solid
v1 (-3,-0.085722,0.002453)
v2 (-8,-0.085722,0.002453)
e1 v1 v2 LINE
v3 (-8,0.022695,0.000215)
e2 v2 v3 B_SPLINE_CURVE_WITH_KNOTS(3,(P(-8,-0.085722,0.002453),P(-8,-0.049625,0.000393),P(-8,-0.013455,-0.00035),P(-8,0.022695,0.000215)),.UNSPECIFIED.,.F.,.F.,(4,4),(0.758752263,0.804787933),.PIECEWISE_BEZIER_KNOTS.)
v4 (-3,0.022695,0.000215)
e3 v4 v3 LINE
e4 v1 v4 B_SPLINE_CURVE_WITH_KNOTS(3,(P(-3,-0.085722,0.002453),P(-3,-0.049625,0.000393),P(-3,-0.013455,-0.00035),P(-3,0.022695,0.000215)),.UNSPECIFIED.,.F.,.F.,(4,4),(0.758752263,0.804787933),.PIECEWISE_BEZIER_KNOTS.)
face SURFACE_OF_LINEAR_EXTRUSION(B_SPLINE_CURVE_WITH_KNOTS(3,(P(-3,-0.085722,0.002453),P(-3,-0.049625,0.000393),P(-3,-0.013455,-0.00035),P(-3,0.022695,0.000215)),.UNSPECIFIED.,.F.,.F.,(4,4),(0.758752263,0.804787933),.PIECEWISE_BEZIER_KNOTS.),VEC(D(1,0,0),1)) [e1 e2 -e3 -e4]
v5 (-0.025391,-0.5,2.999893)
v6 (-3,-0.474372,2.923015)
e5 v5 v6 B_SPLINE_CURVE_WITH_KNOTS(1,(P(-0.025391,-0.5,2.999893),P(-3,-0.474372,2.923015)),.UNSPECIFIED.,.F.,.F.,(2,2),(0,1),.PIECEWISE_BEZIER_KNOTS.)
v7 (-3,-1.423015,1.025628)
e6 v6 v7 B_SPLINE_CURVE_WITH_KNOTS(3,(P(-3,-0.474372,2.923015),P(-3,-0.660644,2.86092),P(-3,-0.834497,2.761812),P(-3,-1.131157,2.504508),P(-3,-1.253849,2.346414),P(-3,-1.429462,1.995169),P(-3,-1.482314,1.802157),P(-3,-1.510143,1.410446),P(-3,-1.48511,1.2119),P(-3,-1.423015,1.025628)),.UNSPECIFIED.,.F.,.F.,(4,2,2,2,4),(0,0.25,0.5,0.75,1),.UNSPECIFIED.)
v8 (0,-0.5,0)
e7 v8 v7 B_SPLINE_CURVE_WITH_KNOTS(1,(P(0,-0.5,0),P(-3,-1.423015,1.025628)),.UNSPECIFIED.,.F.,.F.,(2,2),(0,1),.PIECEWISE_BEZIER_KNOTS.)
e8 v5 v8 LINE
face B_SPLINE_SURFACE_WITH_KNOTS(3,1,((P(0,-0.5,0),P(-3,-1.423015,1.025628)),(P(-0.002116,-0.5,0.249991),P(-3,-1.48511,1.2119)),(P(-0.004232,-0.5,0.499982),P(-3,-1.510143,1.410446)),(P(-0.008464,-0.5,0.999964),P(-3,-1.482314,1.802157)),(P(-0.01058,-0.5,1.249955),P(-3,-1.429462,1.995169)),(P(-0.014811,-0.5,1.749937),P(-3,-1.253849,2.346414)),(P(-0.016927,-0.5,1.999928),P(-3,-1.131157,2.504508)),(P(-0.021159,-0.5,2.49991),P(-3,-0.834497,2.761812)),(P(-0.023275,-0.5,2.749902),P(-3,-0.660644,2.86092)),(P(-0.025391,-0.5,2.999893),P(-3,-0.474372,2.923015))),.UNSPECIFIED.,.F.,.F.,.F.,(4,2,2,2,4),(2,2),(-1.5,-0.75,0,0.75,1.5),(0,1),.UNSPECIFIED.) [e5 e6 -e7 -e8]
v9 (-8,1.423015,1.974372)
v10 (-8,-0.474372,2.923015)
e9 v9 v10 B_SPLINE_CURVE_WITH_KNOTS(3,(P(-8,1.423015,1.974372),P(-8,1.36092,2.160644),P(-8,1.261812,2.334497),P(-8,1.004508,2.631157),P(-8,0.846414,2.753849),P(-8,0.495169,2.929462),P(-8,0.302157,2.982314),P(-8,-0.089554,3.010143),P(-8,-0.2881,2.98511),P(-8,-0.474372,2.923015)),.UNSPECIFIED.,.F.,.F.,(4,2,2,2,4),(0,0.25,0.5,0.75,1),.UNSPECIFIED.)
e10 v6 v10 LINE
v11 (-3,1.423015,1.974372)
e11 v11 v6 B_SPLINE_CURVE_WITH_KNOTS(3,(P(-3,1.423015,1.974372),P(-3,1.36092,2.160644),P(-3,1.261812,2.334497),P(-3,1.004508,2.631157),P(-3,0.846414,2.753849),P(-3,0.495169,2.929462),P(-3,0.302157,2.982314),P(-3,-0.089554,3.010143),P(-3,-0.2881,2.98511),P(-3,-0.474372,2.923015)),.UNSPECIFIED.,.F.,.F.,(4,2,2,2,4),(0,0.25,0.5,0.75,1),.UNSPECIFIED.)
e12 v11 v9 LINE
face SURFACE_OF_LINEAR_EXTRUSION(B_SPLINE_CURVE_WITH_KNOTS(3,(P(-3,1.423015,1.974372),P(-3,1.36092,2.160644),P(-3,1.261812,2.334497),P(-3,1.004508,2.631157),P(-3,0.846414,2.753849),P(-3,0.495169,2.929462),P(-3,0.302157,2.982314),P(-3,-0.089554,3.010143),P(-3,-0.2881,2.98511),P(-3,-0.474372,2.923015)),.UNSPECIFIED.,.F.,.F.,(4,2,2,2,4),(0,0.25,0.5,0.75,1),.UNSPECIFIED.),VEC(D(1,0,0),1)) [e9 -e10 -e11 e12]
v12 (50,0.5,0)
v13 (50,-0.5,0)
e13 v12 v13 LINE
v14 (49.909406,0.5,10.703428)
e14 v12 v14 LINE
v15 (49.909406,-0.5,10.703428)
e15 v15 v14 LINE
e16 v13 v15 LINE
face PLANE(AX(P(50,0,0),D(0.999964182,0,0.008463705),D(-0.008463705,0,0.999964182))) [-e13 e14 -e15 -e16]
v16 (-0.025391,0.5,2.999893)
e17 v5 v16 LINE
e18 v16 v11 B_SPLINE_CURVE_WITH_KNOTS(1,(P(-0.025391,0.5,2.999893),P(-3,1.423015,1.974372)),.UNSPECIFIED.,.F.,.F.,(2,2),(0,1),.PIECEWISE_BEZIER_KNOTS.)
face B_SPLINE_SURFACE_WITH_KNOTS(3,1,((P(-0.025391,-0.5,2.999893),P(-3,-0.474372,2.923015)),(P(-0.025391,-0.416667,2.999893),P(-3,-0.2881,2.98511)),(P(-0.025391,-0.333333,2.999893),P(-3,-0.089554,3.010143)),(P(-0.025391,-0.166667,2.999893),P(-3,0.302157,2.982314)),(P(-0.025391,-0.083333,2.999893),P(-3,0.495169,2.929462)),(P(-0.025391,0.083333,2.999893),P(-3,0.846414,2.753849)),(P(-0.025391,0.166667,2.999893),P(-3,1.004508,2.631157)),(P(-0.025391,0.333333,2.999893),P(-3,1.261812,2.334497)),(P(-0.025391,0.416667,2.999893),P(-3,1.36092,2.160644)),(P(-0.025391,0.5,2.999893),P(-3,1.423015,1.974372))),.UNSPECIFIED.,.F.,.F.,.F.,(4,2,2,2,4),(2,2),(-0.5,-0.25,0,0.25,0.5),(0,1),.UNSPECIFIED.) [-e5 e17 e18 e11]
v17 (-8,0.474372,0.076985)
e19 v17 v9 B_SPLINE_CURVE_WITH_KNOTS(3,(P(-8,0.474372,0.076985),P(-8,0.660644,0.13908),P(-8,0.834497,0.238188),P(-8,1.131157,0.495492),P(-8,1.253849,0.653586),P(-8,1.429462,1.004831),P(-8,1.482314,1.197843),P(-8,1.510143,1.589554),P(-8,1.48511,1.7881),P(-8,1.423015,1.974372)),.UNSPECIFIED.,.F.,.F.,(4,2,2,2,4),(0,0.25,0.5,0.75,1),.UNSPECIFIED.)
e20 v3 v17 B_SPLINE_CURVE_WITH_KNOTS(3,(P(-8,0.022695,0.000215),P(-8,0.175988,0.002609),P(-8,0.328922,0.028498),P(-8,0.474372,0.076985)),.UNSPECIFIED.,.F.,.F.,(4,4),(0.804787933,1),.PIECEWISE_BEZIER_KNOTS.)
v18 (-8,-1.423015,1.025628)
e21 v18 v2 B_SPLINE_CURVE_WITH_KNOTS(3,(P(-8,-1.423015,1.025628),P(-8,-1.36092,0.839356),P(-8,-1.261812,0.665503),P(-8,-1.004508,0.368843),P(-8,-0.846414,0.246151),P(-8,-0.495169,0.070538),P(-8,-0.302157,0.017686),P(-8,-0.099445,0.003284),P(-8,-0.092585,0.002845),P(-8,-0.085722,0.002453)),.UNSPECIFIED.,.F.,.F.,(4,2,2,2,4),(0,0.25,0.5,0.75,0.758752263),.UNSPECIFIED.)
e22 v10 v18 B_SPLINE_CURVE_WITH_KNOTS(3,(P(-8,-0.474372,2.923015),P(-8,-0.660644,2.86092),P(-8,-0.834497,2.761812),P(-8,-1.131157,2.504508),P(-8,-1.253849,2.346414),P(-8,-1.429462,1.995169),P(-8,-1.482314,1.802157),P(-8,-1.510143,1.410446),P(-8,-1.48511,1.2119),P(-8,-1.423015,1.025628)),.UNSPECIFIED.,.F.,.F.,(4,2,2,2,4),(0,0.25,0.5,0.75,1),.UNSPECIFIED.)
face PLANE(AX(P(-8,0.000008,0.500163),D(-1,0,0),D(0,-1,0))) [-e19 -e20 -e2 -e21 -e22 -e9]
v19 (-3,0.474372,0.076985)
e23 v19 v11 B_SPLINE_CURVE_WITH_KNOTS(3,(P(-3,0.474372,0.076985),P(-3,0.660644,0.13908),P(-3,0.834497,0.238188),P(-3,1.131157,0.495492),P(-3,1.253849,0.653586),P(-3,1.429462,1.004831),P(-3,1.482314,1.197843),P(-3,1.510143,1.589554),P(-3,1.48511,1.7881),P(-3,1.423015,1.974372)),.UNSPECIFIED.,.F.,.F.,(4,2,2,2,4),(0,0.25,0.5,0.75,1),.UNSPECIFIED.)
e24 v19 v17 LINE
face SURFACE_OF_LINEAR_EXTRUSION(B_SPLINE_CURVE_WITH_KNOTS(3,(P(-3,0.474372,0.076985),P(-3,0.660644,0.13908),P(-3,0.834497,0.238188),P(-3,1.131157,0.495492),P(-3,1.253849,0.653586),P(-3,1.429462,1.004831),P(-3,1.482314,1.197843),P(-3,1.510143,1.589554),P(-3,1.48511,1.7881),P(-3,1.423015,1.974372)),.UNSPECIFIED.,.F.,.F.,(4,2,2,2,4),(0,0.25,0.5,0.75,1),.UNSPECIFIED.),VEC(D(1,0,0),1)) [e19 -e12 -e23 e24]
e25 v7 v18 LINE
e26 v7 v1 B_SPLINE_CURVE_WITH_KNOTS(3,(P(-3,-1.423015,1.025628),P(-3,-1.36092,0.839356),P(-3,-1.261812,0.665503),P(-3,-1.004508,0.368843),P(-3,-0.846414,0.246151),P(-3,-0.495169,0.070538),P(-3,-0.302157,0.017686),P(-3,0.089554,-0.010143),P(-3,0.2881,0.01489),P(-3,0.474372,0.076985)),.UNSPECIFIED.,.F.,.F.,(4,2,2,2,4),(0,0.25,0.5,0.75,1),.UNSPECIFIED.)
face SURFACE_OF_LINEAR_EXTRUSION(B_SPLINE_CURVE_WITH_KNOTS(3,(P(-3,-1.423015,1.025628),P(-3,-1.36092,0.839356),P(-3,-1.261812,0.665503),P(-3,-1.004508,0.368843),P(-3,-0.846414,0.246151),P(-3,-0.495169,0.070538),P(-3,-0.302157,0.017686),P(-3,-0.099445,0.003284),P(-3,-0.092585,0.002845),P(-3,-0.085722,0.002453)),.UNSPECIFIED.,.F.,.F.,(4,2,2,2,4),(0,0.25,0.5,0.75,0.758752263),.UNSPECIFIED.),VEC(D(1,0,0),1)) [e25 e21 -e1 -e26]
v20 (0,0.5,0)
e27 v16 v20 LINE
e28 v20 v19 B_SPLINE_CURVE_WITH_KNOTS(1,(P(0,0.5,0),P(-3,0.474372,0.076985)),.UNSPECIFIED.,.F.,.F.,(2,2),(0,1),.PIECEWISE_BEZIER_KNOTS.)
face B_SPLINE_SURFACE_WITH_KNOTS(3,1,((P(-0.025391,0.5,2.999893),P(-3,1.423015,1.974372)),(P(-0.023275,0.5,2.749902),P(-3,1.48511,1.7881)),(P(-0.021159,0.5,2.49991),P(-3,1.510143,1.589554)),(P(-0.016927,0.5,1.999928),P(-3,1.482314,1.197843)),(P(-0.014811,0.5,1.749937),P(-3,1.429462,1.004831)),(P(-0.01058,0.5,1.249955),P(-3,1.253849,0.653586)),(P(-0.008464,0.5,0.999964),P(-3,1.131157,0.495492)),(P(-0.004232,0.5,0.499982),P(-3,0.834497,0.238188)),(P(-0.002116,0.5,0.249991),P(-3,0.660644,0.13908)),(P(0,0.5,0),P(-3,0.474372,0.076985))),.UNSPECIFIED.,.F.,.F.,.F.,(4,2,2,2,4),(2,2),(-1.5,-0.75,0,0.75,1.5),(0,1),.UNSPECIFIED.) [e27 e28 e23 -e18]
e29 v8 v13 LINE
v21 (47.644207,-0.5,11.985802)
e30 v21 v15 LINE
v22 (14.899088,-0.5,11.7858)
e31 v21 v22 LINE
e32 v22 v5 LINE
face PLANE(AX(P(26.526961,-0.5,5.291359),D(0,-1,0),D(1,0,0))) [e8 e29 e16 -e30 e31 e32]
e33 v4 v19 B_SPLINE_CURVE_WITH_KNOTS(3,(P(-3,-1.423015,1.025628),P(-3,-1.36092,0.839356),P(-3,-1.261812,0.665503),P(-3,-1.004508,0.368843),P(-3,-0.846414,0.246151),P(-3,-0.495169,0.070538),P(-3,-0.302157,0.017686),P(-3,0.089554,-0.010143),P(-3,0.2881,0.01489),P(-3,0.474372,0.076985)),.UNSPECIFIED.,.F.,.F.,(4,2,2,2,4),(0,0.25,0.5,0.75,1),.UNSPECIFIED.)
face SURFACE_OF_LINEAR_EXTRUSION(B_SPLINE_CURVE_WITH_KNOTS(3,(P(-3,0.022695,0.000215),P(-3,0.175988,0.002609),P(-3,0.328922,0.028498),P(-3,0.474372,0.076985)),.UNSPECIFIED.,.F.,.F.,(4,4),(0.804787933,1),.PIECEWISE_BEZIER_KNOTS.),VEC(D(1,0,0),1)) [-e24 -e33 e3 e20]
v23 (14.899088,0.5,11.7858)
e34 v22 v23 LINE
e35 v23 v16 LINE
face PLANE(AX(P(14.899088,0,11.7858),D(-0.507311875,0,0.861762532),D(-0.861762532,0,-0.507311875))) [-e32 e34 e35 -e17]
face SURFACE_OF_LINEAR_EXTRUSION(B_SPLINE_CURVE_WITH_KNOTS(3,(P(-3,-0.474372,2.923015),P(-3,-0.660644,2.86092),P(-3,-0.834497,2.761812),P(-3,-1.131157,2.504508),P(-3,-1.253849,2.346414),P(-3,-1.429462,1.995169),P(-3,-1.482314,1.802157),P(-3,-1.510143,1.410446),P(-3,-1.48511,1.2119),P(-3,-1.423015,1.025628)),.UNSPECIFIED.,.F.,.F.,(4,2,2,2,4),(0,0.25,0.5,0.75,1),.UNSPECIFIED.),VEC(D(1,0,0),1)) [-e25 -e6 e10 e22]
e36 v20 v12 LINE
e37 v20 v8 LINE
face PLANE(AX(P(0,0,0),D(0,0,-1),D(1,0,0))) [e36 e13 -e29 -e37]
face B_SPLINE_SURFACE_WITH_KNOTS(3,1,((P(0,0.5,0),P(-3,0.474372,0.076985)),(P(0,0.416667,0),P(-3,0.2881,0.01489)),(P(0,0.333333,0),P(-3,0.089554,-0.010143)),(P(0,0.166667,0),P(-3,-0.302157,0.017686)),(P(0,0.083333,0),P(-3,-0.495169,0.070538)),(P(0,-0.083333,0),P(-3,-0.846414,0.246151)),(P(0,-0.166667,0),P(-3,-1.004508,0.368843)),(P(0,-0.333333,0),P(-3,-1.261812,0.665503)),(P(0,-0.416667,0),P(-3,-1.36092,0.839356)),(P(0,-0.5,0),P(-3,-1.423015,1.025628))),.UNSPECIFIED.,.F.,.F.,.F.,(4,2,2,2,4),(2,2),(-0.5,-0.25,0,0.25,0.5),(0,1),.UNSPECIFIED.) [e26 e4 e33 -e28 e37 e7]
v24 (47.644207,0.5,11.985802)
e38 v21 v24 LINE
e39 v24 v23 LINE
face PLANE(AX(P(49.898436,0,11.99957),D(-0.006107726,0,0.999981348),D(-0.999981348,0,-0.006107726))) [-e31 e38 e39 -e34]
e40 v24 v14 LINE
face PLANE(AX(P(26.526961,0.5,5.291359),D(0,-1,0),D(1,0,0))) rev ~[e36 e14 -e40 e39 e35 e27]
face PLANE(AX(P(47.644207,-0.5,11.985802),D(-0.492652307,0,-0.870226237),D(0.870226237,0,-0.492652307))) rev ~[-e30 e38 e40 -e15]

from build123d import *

# Parameters (mm, degrees)
F1_DEPTH  = 0.5
F1_FACE_W = 1
F1_FACE_H = 3
F6_DEPTH  = 5
F8_DEPTH  = 25


# Not quite as in the source:
# - the arcs of a loft's sections are written as splines that run evenly, so that the points pair up as in the source's solid


with BuildPart() as f1:
    # F0 (on Front) → F1 (new body, symmetric)
    with BuildSketch(Plane.XZ):
        Polygon((-0.0253911159, 2.9998925466), (0, 0), (50, 0), (49.8984355364, 11.9995701865), (14.899088368, 11.7857997863), align=None)
    extrude(amount=F1_DEPTH, both=True)

    # F1_face (on face) → F4 section 0
    with BuildSketch(Plane(origin=(-0.0126955579, 0, 1.4999462733), x_dir=(0, -1, 0), z_dir=(-0.9999641822, 0, -0.0084637053))):
        Rectangle(F1_FACE_W, F1_FACE_H)
    # F3 (on offset) → F4 section 1
    with BuildSketch(Plane.YZ.offset(-3)):
        with BuildLine():
            add(Edge.make_bspline(
                [(-0.4743722327, 2.9230147522), (-0.6606444281, 2.8609195721), (-0.834496694, 2.7618115588), (-1.1311572384, 2.5045080607), (-1.2538487938, 2.3464138139), (-1.4294616132, 1.995169303), (-1.482313781, 1.8021572386), (-1.5101434154, 1.4104455076), (-1.4851099322, 1.2118999628), (-1.4230147522, 1.0256277673)],
                knots=[0, 0, 0, 0, 0.25, 0.25, 0.5, 0.5, 0.75, 0.75, 1, 1, 1, 1], degree=3))
            add(Edge.make_bspline(
                [(-1.4230147522, 1.0256277673), (-1.3609195721, 0.8393555719), (-1.2618115588, 0.665503306), (-1.0045080607, 0.3688427616), (-0.8464138139, 0.2461512062), (-0.495169303, 0.0705383868), (-0.3021572386, 0.017686219), (0.0895544924, -0.0101434154), (0.2881000372, 0.0148900678), (0.4743722327, 0.0769852478)],
                knots=[0, 0, 0, 0, 0.25, 0.25, 0.5, 0.5, 0.75, 0.75, 1, 1, 1, 1], degree=3))
            add(Edge.make_bspline(
                [(0.4743722327, 0.0769852478), (0.6606444281, 0.1390804279), (0.834496694, 0.2381884412), (1.1311572384, 0.4954919393), (1.2538487938, 0.6535861861), (1.4294616132, 1.004830697), (1.482313781, 1.1978427614), (1.5101434154, 1.5895544924), (1.4851099322, 1.7881000372), (1.4230147522, 1.9743722327)],
                knots=[0, 0, 0, 0, 0.25, 0.25, 0.5, 0.5, 0.75, 0.75, 1, 1, 1, 1], degree=3))
            add(Edge.make_bspline(
                [(1.4230147522, 1.9743722327), (1.3609195721, 2.1606444281), (1.2618115588, 2.334496694), (1.0045080607, 2.6311572384), (0.8464138139, 2.7538487938), (0.495169303, 2.9294616132), (0.3021572386, 2.982313781), (-0.0895544924, 3.0101434154), (-0.2881000372, 2.9851099322), (-0.4743722327, 2.9230147522)],
                knots=[0, 0, 0, 0, 0.25, 0.25, 0.5, 0.5, 0.75, 0.75, 1, 1, 1, 1], degree=3))
        make_face()
    loft(ruled=True)

    # F5 (on face) → F6 (join)
    with BuildSketch(Plane(origin=(-3, 0, 0), x_dir=(0, -1, 0), z_dir=(-1, 0, 0))):
        with BuildLine():
            add(Edge.make_bspline(
                [(0.2236067977, 0.9472135955), (0.2049485822, 0.9590404276), (0.165567887, 0.9783654777), (0.1016629971, 0.9971413164), (0.0354857267, 0.9971906029), (-0.0298581595, 1.006417373), (-0.0962378171, 0.9979647462), (-0.1574135127, 0.9730184068), (-0.2213803356, 0.9564199077), (-0.2794920021, 0.9232440711), (-0.3264257064, 0.8766967879), (-0.3795448144, 0.8369923373), (-0.419371865, 0.7835849556), (-0.4393276132, 0.744366395), (-0.4472135955, 0.7236067977)],
                knots=[0, 0, 0, 0, 0.0661130278, 0.1311431351, 0.1976238463, 0.263561262, 0.3285913694, 0.3952621183, 0.461199534, 0.5262296414, 0.5929003903, 0.6590289395, 0.7240590469, 0.7905532518, 0.7905532518, 0.7905532518, 0.7905532518], degree=3))
            add(Edge.make_bspline(
                [(-0.4472135955, 0.7236067977), (-0.4590404276, 0.7049485822), (-0.4783654777, 0.665567887), (-0.4971413164, 0.6016629971), (-0.4971906029, 0.5354857267), (-0.506417373, 0.4701418405), (-0.4979647462, 0.4037621829), (-0.4730184068, 0.3425864873), (-0.4564199077, 0.2786196644), (-0.4232440711, 0.2205079979), (-0.3766967879, 0.1735742936), (-0.3369923373, 0.1204551856), (-0.2835849556, 0.080628135), (-0.244366395, 0.0606723868), (-0.2236067977, 0.0527864045)],
                knots=[0, 0, 0, 0, 0.0661130278, 0.1311431351, 0.1976238463, 0.263561262, 0.3285913694, 0.3952621183, 0.461199534, 0.5262296414, 0.5929003903, 0.6590289395, 0.7240590469, 0.7905532518, 0.7905532518, 0.7905532518, 0.7905532518], degree=3))
            add(Edge.make_bspline(
                [(-0.2236067977, 0.0527864045), (-0.2049485822, 0.0409595724), (-0.165567887, 0.0216345223), (-0.1016629971, 0.0028586836), (-0.0533041533, 0.0028226676), (-0.0269411852, 0.0005980705), (-0.0226951286, 0.0002149422)],
                knots=[0, 0, 0, 0, 0.0661130278, 0.1311431351, 0.1976238463, 0.2103977386, 0.2103977386, 0.2103977386, 0.2103977386], degree=3))
            add(Edge.make_bspline(
                [(0.0857219406, 0.0024530962), (0.0496252148, 0.0003925316), (0.0134550487, -0.000349593), (-0.0226951286, 0.0002149422)],
                knots=[0.7587522631, 0.7587522631, 0.7587522631, 0.7587522631, 0.8047879331, 0.8047879331, 0.8047879331, 0.8047879331], degree=3))
            add(Edge.make_bspline(
                [(0.0857219406, 0.0024530962), (0.0887772594, 0.0031276832), (0.1134683814, 0.0090615655), (0.1574135127, 0.0269815932), (0.2213803356, 0.0435800923), (0.2794920021, 0.0767559289), (0.3264257064, 0.1233032121), (0.3795448144, 0.1630076627), (0.419371865, 0.2164150444), (0.4393276132, 0.255633605), (0.4472135955, 0.2763932023)],
                knots=[0.3192274693, 0.3192274693, 0.3192274693, 0.3192274693, 0.3285913694, 0.3952621183, 0.461199534, 0.5262296414, 0.5929003903, 0.6590289395, 0.7240590469, 0.7905532518, 0.7905532518, 0.7905532518, 0.7905532518], degree=3))
            add(Edge.make_bspline(
                [(0.4472135955, 0.2763932023), (0.4590404276, 0.2950514178), (0.4783654777, 0.334432113), (0.4971413164, 0.3983370029), (0.4971906029, 0.4645142733), (0.506417373, 0.5298581595), (0.4979647462, 0.5962378171), (0.4730184068, 0.6574135127), (0.4564199077, 0.7213803356), (0.4232440711, 0.7794920021), (0.3766967879, 0.8264257064), (0.3369923373, 0.8795448144), (0.2835849556, 0.919371865), (0.244366395, 0.9393276132), (0.2236067977, 0.9472135955)],
                knots=[0, 0, 0, 0, 0.0661130278, 0.1311431351, 0.1976238463, 0.263561262, 0.3285913694, 0.3952621183, 0.461199534, 0.5262296414, 0.5929003903, 0.6590289395, 0.7240590469, 0.7905532518, 0.7905532518, 0.7905532518, 0.7905532518], degree=3))
        make_face()
        with BuildLine():
            add(Edge.make_bspline(
                [(-0.4472135955, 0.7236067977), (-0.4590404276, 0.7049485822), (-0.4783654777, 0.665567887), (-0.4971413164, 0.6016629971), (-0.4971906029, 0.5354857267), (-0.506417373, 0.4701418405), (-0.4979647462, 0.4037621829), (-0.4730184068, 0.3425864873), (-0.4564199077, 0.2786196644), (-0.4232440711, 0.2205079979), (-0.3766967879, 0.1735742936), (-0.3369923373, 0.1204551856), (-0.2835849556, 0.080628135), (-0.244366395, 0.0606723868), (-0.2236067977, 0.0527864045)],
                knots=[0, 0, 0, 0, 0.0661130278, 0.1311431351, 0.1976238463, 0.263561262, 0.3285913694, 0.3952621183, 0.461199534, 0.5262296414, 0.5929003903, 0.6590289395, 0.7240590469, 0.7905532518, 0.7905532518, 0.7905532518, 0.7905532518], degree=3))
            add(Edge.make_bspline(
                [(0.2236067977, 0.9472135955), (0.2049485822, 0.9590404276), (0.165567887, 0.9783654777), (0.1016629971, 0.9971413164), (0.0354857267, 0.9971906029), (-0.0298581595, 1.006417373), (-0.0962378171, 0.9979647462), (-0.1574135127, 0.9730184068), (-0.2213803356, 0.9564199077), (-0.2794920021, 0.9232440711), (-0.3264257064, 0.8766967879), (-0.3795448144, 0.8369923373), (-0.419371865, 0.7835849556), (-0.4393276132, 0.744366395), (-0.4472135955, 0.7236067977)],
                knots=[0, 0, 0, 0, 0.0661130278, 0.1311431351, 0.1976238463, 0.263561262, 0.3285913694, 0.3952621183, 0.461199534, 0.5262296414, 0.5929003903, 0.6590289395, 0.7240590469, 0.7905532518, 0.7905532518, 0.7905532518, 0.7905532518], degree=3))
            add(Edge.make_bspline(
                [(0.4472135955, 0.2763932023), (0.4590404276, 0.2950514178), (0.4783654777, 0.334432113), (0.4971413164, 0.3983370029), (0.4971906029, 0.4645142733), (0.506417373, 0.5298581595), (0.4979647462, 0.5962378171), (0.4730184068, 0.6574135127), (0.4564199077, 0.7213803356), (0.4232440711, 0.7794920021), (0.3766967879, 0.8264257064), (0.3369923373, 0.8795448144), (0.2835849556, 0.919371865), (0.244366395, 0.9393276132), (0.2236067977, 0.9472135955)],
                knots=[0, 0, 0, 0, 0.0661130278, 0.1311431351, 0.1976238463, 0.263561262, 0.3285913694, 0.3952621183, 0.461199534, 0.5262296414, 0.5929003903, 0.6590289395, 0.7240590469, 0.7905532518, 0.7905532518, 0.7905532518, 0.7905532518], degree=3))
            add(Edge.make_bspline(
                [(0.0857219406, 0.0024530962), (0.0887772594, 0.0031276832), (0.1134683814, 0.0090615655), (0.1574135127, 0.0269815932), (0.2213803356, 0.0435800923), (0.2794920021, 0.0767559289), (0.3264257064, 0.1233032121), (0.3795448144, 0.1630076627), (0.419371865, 0.2164150444), (0.4393276132, 0.255633605), (0.4472135955, 0.2763932023)],
                knots=[0.3192274693, 0.3192274693, 0.3192274693, 0.3192274693, 0.3285913694, 0.3952621183, 0.461199534, 0.5262296414, 0.5929003903, 0.6590289395, 0.7240590469, 0.7905532518, 0.7905532518, 0.7905532518, 0.7905532518], degree=3))
            add(Edge.make_bspline(
                [(1.4230147522, 1.0256277673), (1.3609195721, 0.8393555719), (1.2618115588, 0.665503306), (1.0045080607, 0.3688427616), (0.8464138139, 0.2461512062), (0.495169303, 0.0705383868), (0.3021572386, 0.017686219), (0.0994446448, 0.0032842572), (0.09258462, 0.002844849), (0.0857219406, 0.0024530962)],
                knots=[0, 0, 0, 0, 0.25, 0.25, 0.5, 0.5, 0.75, 0.75, 0.7587522631, 0.7587522631, 0.7587522631, 0.7587522631], degree=3))
            add(Edge.make_bspline(
                [(0.4743722327, 2.9230147522), (0.6606444281, 2.8609195721), (0.834496694, 2.7618115588), (1.1311572384, 2.5045080607), (1.2538487938, 2.3464138139), (1.4294616132, 1.995169303), (1.482313781, 1.8021572386), (1.5101434154, 1.4104455076), (1.4851099322, 1.2118999628), (1.4230147522, 1.0256277673)],
                knots=[0, 0, 0, 0, 0.25, 0.25, 0.5, 0.5, 0.75, 0.75, 1, 1, 1, 1], degree=3))
            add(Edge.make_bspline(
                [(-1.4230147522, 1.9743722327), (-1.3609195721, 2.1606444281), (-1.2618115588, 2.334496694), (-1.0045080607, 2.6311572384), (-0.8464138139, 2.7538487938), (-0.495169303, 2.9294616132), (-0.3021572386, 2.982313781), (0.0895544924, 3.0101434154), (0.2881000372, 2.9851099322), (0.4743722327, 2.9230147522)],
                knots=[0, 0, 0, 0, 0.25, 0.25, 0.5, 0.5, 0.75, 0.75, 1, 1, 1, 1], degree=3))
            add(Edge.make_bspline(
                [(-0.4743722327, 0.0769852478), (-0.6606444281, 0.1390804279), (-0.834496694, 0.2381884412), (-1.1311572384, 0.4954919393), (-1.2538487938, 0.6535861861), (-1.4294616132, 1.004830697), (-1.482313781, 1.1978427614), (-1.5101434154, 1.5895544924), (-1.4851099322, 1.7881000372), (-1.4230147522, 1.9743722327)],
                knots=[0, 0, 0, 0, 0.25, 0.25, 0.5, 0.5, 0.75, 0.75, 1, 1, 1, 1], degree=3))
            add(Edge.make_bspline(
                [(-0.0226951286, 0.0002149422), (-0.1759882345, 0.002608827), (-0.3289219115, 0.0284983341), (-0.4743722327, 0.0769852478)],
                knots=[0.8047879331, 0.8047879331, 0.8047879331, 0.8047879331, 1, 1, 1, 1], degree=3))
            add(Edge.make_bspline(
                [(-0.2236067977, 0.0527864045), (-0.2049485822, 0.0409595724), (-0.165567887, 0.0216345223), (-0.1016629971, 0.0028586836), (-0.0533041533, 0.0028226676), (-0.0269411852, 0.0005980705), (-0.0226951286, 0.0002149422)],
                knots=[0, 0, 0, 0, 0.0661130278, 0.1311431351, 0.1976238463, 0.2103977386, 0.2103977386, 0.2103977386, 0.2103977386], degree=3))
        make_face()
    extrude(amount=F6_DEPTH)

    # F7 (on face) → F8 (cut)
    with BuildSketch(Plane.XZ.offset(0.5)):
        Polygon((49.8984355364, 11.9995701865), (47.6442072011, 11.9858017213), (49.9094060968, 10.7034277653), align=None)
    extrude(amount=-F8_DEPTH, mode=Mode.SUBTRACT)


solid = f1.part
